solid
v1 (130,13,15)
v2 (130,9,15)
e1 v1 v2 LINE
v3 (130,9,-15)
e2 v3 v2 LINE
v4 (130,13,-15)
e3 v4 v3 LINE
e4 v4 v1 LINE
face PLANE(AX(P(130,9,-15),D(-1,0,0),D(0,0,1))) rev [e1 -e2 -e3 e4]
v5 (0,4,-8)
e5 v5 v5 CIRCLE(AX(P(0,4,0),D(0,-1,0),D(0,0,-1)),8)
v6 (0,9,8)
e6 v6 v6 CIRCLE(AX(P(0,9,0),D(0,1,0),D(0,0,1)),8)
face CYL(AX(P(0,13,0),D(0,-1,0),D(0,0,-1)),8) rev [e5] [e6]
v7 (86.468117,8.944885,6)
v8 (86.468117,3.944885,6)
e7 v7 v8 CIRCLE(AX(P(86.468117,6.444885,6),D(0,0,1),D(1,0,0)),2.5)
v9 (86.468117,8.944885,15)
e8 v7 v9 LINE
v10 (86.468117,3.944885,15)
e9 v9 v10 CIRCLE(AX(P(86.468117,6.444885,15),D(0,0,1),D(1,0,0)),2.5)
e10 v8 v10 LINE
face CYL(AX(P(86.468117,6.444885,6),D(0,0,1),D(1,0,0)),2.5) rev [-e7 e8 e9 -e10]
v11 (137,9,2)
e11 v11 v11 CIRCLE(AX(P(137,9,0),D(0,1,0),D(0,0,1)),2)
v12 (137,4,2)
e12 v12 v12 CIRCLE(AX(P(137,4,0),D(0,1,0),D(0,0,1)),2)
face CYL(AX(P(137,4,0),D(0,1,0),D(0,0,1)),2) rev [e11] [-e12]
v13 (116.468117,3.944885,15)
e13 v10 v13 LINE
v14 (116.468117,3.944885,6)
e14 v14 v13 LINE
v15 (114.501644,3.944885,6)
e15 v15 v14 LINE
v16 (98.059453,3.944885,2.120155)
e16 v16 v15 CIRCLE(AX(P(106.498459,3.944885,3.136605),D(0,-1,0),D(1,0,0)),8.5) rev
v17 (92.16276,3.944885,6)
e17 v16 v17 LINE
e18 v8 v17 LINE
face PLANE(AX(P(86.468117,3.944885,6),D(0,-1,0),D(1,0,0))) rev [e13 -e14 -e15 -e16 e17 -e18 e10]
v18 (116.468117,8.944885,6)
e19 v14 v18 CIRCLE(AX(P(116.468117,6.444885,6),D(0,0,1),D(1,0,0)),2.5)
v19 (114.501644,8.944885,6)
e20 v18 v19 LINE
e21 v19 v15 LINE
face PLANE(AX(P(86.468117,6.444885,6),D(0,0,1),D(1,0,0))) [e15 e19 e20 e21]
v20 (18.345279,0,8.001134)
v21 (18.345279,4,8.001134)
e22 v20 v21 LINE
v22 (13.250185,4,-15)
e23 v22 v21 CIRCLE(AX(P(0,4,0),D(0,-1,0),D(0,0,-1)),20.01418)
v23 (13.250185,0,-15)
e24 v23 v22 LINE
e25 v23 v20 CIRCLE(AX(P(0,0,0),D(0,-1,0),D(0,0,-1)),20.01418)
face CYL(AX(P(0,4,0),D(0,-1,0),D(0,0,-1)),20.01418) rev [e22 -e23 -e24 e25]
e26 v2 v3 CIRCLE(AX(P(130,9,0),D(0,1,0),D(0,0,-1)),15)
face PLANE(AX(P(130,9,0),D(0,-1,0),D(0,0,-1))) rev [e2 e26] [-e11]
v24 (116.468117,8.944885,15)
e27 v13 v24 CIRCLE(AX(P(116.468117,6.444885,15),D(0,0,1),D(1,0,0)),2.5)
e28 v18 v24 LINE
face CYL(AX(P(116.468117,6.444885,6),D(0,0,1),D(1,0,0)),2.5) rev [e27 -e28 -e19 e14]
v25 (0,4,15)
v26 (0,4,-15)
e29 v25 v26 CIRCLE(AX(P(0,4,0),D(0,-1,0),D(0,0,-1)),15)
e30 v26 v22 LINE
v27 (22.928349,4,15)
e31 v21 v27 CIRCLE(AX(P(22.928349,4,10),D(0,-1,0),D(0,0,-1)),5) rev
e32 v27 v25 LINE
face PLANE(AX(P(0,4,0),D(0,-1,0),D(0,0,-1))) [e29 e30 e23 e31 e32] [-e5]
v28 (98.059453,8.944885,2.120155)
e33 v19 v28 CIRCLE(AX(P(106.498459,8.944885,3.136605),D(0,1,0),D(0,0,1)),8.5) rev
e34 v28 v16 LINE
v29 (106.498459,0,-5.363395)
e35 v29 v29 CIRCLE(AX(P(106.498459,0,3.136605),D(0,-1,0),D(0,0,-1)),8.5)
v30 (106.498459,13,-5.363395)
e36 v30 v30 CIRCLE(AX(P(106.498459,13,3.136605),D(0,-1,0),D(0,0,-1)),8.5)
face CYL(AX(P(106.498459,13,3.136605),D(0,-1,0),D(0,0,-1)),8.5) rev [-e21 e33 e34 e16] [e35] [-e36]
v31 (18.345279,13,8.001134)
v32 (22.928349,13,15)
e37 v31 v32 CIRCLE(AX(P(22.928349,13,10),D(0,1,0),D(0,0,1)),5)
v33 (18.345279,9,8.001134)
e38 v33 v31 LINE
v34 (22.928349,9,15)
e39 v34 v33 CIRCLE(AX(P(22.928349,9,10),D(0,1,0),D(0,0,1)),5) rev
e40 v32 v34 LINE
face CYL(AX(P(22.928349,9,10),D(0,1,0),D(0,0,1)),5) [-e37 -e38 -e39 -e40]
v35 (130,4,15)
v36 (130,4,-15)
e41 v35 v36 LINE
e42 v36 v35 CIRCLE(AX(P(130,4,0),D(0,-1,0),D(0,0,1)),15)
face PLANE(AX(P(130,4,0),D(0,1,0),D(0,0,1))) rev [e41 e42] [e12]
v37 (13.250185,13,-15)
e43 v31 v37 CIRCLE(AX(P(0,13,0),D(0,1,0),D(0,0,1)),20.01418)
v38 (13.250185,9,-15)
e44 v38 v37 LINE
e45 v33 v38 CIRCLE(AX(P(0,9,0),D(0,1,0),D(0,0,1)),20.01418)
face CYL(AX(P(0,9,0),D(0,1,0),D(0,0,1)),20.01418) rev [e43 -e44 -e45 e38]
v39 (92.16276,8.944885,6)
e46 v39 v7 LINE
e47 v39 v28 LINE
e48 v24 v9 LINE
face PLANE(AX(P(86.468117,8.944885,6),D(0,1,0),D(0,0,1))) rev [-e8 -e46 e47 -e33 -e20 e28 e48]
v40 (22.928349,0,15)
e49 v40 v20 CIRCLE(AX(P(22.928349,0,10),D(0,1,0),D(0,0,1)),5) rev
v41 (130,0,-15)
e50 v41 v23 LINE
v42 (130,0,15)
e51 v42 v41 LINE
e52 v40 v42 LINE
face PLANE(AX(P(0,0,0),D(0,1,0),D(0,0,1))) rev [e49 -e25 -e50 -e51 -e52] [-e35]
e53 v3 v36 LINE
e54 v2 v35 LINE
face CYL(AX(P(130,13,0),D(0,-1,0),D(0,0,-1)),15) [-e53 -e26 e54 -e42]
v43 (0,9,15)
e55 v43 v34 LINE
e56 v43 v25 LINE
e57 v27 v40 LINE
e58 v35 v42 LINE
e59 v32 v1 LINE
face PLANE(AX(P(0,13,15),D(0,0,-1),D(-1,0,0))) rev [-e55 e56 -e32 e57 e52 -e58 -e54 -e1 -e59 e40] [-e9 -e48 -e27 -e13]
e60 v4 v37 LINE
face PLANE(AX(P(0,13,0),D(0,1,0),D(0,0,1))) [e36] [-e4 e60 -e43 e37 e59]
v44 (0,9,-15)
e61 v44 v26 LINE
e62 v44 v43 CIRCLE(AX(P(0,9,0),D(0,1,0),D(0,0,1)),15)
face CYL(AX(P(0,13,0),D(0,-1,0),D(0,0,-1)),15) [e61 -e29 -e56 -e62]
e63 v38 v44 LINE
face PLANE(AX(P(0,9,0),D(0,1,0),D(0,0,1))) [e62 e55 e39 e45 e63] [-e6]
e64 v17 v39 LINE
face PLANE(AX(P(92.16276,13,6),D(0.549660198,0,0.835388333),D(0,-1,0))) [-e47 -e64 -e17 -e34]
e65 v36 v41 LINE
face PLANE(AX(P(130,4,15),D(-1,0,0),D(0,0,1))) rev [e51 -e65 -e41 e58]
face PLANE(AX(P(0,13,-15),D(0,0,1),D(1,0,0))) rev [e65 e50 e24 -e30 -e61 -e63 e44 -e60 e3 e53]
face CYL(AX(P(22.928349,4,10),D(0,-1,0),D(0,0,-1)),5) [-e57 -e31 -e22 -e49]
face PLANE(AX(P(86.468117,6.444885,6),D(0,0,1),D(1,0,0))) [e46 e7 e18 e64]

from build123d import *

# Parameters (mm, degrees)
MAIN_R              = 8
BOSS_EXTRUDE1_DEPTH = 13
CUT_EXTRUDE5_START  = -4
CUT_EXTRUDE5_DEPTH  = 4
CUT_EXTRUDE6_DEPTH  = 4
JOINT_HOLE_R        = 8.5
CUT_EXTRUDE7_DEPTH  = 13
CUT_EXTRUDE8_DEPTH  = 9
SKETCH9_R           = 20.014179858
CUT_EXTRUDE9_DEPTH  = 4
CUT_EXTRUDE10_START = -4
SKETCH10_R          = 20.014179858
CUT_EXTRUDE10_DEPTH = 4
FILLET1_R           = 5
FILLET2_R           = 5
CUT_EXTRUDE11_DEPTH = 5
CHAMFER1_START      = 3.94488544
CHAMFER1_DEPTH      = 5


with BuildPart() as part:
    # main → Boss-Extrude1 (new body)
    with BuildSketch(Plane(origin=(0, 0, 0), x_dir=(1, 0, 0), z_dir=(0, 1, 0))):
        with BuildLine():
            Line((0, 15), (130, 15))
            ThreePointArc((130, 15), (145, 0), (130, -15))
            Line((130, -15), (0, -15))
            ThreePointArc((0, -15), (-15, 0), (0, 15))
        make_face()
        with Locations(Location((0, 0, 0), (0, 0, 270))):
            Circle(MAIN_R, mode=Mode.SUBTRACT)
    extrude(amount=BOSS_EXTRUDE1_DEPTH)

    # Sketch5 → Cut-Extrude5 (cut)
    with BuildSketch(Plane(origin=(0, 13, 0), x_dir=(1, 0, 0), z_dir=(0, 1, 0)).offset(CUT_EXTRUDE5_START)):
        with BuildLine():
            Line((130, 15), (130, -15))
            ThreePointArc((130, -15), (145, 0), (130, 15))
        make_face()
    extrude(amount=CUT_EXTRUDE5_DEPTH, mode=Mode.SUBTRACT)

    # Sketch6 → Cut-Extrude6 (cut)
    with BuildSketch(Plane.XZ):
        with BuildLine():
            Line((130, 15), (130, -15))
            ThreePointArc((130, -15), (145, 0), (130, 15))
        make_face()
    extrude(amount=-CUT_EXTRUDE6_DEPTH, mode=Mode.SUBTRACT)

    # joint hole → Cut-Extrude7 (cut)
    with BuildSketch(Plane.XZ):
        with Locations(Location((106.49845917, 3.136605167, 0), (0, 0, 270))):
            Circle(JOINT_HOLE_R)
    extrude(amount=-CUT_EXTRUDE7_DEPTH, mode=Mode.SUBTRACT)

    # cut_out joint → Cut-Extrude8 (cut)
    with BuildSketch(Plane.XY.offset(15)):
        with BuildLine():
            Line((86.468116833, 8.94488544), (116.468116833, 8.94488544))
            ThreePointArc((116.468116833, 8.94488544), (118.968116833, 6.44488544), (116.468116833, 3.94488544))
            Line((116.468116833, 3.94488544), (86.468116833, 3.94488544))
            ThreePointArc((86.468116833, 3.94488544), (83.968116833, 6.44488544), (86.468116833, 8.94488544))
        make_face()
    extrude(amount=-CUT_EXTRUDE8_DEPTH, mode=Mode.SUBTRACT)

    # Sketch9 → Cut-Extrude9 (cut)
    with BuildSketch(Plane(origin=(0, 13, 0), x_dir=(1, 0, 0), z_dir=(0, 1, 0))):
        Circle(SKETCH9_R)
    extrude(amount=-CUT_EXTRUDE9_DEPTH, mode=Mode.SUBTRACT)

    # Sketch10 → Cut-Extrude10 (cut)
    with BuildSketch(Plane.XZ.offset(CUT_EXTRUDE10_START)):
        Circle(SKETCH10_R)
    extrude(amount=CUT_EXTRUDE10_DEPTH, mode=Mode.SUBTRACT)

    # Fillet1
    fillet1_edges = [part.edges().sort_by_distance(p)[0] for p in [
        (13.25018473, 2, 15),
    ]]
    fillet(fillet1_edges, radius=FILLET1_R)

    # Fillet2
    fillet2_edges = [part.edges().sort_by_distance(p)[0] for p in [
        (13.25018473, 11, 15),
    ]]
    fillet(fillet2_edges, radius=FILLET2_R)

    # Sketch11 → Cut-Extrude11 (cut)
    with BuildSketch(Plane(origin=(0, 9, 0), x_dir=(1, 0, 0), z_dir=(0, 1, 0))):
        with BuildLine():
            ThreePointArc((136.154229069, 1.81236628), (135, 0), (136.154229069, -1.81236628))
            Line((136.154229069, -1.81236628), (137, 0))
            Line((137, 0), (136.154229069, 1.81236628))
        make_face()
        with BuildLine():
            Line((137, 0), (136.154229069, -1.81236628))
            ThreePointArc((136.154229069, -1.81236628), (138.074350534, -1.686941294), (139, 0))
            ThreePointArc((139, 0), (138.074350534, 1.686941294), (136.154229069, 1.81236628))
            Line((136.154229069, 1.81236628), (137, 0))
        make_face()
    extrude(amount=-CUT_EXTRUDE11_DEPTH, mode=Mode.SUBTRACT)

    # Chamfer1: read off the stored shape, not the designer's step
    # Chamfer1 outline → Chamfer1 (cut)
    with BuildSketch(Plane(origin=(0, 0, 0), x_dir=(1, 0, 0), z_dir=(0, 1, 0)).offset(CHAMFER1_START)):
        with BuildLine():
            Line((98.059452794, -2.120154778), (92.162759821, -6))
            Line((92.162759821, -6), (98.495274177, -6))
            ThreePointArc((98.495274177, -6), (98.05158318, -4.085439196), (98.059452794, -2.120154778))
        make_face()
    extrude(amount=CHAMFER1_DEPTH, mode=Mode.SUBTRACT)


solid = part.part
